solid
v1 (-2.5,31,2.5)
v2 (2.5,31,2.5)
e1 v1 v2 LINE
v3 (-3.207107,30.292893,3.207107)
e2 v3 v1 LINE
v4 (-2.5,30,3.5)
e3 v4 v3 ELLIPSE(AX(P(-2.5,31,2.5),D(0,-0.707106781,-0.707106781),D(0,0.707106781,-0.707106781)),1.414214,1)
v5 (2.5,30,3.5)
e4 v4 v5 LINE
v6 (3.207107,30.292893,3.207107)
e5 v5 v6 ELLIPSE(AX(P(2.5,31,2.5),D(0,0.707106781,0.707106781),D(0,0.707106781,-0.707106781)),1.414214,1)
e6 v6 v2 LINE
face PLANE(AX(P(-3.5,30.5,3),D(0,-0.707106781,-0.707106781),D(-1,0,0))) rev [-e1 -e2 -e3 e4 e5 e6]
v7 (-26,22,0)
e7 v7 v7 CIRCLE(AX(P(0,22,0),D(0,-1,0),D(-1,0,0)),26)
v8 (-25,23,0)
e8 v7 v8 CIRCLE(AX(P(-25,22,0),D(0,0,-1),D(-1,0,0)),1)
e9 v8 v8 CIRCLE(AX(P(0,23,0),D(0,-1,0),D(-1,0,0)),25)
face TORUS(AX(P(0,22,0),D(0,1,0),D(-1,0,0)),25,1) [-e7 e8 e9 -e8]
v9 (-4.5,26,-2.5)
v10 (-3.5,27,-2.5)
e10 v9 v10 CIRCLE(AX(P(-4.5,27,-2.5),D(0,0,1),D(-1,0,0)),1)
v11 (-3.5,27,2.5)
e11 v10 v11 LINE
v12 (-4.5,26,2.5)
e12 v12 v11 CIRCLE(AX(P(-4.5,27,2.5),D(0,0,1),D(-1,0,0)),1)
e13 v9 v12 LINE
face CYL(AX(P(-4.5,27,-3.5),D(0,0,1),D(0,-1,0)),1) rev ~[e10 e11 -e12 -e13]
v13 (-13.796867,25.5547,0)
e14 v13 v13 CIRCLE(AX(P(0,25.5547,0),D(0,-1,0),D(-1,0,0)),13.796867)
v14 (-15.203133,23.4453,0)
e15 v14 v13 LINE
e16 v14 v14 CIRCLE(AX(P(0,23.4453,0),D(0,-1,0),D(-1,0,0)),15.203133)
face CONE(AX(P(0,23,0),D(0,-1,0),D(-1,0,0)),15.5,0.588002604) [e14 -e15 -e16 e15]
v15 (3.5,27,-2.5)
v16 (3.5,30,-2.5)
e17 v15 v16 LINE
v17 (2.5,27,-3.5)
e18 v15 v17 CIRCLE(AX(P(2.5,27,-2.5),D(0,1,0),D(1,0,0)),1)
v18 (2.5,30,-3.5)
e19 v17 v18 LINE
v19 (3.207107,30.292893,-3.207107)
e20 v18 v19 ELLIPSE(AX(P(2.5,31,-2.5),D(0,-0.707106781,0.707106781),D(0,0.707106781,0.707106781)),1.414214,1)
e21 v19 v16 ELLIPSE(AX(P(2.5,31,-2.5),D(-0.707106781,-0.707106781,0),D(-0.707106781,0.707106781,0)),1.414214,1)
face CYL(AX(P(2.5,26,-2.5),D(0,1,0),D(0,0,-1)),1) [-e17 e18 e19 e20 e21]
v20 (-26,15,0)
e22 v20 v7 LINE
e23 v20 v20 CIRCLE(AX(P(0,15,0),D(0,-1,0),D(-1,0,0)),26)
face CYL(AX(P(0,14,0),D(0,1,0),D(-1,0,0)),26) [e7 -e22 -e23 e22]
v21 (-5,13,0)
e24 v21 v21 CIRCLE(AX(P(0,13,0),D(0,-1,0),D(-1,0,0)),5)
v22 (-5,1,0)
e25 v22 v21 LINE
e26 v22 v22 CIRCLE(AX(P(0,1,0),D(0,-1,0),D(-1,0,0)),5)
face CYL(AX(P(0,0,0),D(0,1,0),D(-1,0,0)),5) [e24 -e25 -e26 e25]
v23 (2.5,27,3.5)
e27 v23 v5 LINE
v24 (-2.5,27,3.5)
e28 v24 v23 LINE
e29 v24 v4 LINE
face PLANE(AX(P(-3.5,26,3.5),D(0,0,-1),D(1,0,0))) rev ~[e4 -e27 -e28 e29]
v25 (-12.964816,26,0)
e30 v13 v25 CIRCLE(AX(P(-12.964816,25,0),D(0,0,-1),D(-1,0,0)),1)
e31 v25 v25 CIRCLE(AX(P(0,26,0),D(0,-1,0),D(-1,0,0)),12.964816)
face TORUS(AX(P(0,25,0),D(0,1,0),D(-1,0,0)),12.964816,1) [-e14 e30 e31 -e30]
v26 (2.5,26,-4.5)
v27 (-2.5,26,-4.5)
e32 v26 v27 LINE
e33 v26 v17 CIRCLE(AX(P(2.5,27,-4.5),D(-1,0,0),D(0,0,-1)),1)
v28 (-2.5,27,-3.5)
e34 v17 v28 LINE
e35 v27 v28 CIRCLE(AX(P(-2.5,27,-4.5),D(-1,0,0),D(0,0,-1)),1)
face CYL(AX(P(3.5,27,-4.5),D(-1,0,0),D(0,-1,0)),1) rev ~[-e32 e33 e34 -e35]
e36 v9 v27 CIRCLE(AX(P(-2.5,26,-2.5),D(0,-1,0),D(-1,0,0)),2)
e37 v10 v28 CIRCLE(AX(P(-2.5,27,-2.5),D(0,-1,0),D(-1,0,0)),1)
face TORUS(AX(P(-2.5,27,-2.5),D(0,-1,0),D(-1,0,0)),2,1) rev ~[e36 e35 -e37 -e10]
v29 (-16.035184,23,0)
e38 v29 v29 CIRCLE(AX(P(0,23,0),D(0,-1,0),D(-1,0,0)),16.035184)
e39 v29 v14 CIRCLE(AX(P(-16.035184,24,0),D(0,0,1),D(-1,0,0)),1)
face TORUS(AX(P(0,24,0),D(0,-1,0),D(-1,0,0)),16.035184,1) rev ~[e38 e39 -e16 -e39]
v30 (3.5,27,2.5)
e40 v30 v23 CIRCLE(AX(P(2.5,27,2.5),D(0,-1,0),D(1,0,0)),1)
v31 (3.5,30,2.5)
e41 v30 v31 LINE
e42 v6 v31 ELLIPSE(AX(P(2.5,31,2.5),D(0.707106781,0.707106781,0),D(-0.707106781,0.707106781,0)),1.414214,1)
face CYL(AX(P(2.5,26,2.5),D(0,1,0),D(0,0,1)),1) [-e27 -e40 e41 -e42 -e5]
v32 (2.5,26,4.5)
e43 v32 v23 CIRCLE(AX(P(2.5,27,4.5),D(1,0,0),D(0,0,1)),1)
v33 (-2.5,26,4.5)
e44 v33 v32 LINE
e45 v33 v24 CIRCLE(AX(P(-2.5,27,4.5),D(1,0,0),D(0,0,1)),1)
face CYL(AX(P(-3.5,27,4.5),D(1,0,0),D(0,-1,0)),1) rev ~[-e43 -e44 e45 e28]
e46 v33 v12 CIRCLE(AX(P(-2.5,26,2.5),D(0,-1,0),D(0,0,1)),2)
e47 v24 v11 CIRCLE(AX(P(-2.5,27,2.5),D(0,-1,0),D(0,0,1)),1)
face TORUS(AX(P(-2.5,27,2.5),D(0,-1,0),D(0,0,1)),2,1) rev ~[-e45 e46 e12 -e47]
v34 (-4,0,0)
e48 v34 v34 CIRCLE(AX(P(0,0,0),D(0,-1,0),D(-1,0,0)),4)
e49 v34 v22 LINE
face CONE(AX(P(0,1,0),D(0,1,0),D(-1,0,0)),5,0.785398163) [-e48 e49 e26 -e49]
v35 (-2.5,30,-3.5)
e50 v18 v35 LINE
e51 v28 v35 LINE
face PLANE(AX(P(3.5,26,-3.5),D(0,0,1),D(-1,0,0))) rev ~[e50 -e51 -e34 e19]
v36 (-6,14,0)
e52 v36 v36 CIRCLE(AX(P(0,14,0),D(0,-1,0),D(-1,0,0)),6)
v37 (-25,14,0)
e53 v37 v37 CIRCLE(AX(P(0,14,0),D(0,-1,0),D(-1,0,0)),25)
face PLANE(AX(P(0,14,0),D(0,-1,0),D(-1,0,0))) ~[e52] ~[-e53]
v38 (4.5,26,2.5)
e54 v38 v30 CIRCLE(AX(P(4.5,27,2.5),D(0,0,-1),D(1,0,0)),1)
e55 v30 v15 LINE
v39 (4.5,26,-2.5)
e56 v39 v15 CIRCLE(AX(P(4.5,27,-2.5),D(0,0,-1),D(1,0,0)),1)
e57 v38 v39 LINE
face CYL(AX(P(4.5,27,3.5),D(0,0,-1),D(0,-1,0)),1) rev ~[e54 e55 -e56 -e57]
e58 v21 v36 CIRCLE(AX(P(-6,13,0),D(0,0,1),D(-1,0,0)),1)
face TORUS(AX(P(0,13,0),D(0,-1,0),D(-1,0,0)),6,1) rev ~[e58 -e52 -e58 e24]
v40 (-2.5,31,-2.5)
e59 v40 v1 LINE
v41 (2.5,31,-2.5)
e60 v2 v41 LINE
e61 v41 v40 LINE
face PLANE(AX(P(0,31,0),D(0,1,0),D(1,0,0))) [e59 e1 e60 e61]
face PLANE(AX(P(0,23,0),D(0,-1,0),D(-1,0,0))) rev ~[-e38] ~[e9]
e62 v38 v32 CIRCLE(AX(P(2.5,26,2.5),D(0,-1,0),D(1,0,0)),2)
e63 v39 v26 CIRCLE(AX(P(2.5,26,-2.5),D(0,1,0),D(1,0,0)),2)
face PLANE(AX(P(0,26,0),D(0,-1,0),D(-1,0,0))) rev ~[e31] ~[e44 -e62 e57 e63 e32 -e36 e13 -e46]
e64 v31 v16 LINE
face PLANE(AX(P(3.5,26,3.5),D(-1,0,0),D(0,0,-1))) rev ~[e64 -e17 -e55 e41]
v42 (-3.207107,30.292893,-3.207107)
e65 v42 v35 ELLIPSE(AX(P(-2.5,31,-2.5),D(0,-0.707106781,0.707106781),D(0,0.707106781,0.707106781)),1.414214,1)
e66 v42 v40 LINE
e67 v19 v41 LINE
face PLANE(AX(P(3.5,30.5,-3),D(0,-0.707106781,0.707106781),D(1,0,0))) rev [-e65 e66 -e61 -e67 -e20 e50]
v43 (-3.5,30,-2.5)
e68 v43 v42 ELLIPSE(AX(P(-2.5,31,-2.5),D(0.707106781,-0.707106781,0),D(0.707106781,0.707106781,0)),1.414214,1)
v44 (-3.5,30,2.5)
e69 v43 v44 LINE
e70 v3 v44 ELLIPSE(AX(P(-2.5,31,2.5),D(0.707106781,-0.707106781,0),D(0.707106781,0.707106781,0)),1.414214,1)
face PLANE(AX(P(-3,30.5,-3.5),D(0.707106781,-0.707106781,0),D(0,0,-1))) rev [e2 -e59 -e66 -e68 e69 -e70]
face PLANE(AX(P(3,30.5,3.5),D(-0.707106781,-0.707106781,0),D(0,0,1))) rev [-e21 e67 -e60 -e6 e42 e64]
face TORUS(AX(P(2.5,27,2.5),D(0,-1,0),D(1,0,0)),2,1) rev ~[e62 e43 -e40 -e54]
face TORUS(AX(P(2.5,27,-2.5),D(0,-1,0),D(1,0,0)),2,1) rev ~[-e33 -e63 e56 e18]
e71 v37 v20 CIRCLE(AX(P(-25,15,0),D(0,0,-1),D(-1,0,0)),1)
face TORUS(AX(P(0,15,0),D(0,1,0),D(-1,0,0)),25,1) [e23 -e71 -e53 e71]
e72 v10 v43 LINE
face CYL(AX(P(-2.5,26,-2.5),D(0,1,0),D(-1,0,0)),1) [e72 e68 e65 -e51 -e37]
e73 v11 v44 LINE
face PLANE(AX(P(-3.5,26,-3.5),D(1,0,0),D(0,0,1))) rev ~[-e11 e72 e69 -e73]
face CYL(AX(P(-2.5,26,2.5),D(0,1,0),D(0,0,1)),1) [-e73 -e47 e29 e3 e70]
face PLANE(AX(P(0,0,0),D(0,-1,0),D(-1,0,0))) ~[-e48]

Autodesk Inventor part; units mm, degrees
ref_plane "YZ Plane" through (0, 0, 0) normal (1, 0, 0) x (0, 1, 0)
ref_plane "XZ Plane" through (0, 0, 0) normal (0, 1, 0) x (-1, 0, 0)
ref_plane "XY Plane" through (0, 0, 0) normal (0, 0, 1) x (1, 0, 0)
sketch "Sketch1" plane through (0, 0, 0) normal (0, 0, 1) x (1, 0, 0)
  line L0 (0, 0) -> (-5, 0)
  line L1 (-5, 0) -> (-5, 14)
  line L2 (-5, 14) -> (-26, 14)
  line L3 (-26, 14) -> (-26, 23)
  line L4 (-26, 23) -> (-15.5, 23)
  line L5 (-15.5, 23) -> (-13.5, 26)
  line L6 (-13.5, 26) -> (0, 26)
  line L7 (0, 26) -> (0, 0) construction
  line L8 (0, 26) -> (0, 0)
  dimension "d0" = 5
  dimension "d1" = 14
  dimension "d2" = 9
  dimension "d4" = 3
  dimension "d5" = 13.5
  dimension "d6" = 15.5
  dimension "d7" = 26
  dimension "d8" = 26
revolve "Revolution1" add sketch "Sketch1" angle 360 about axis through (0, 26, 0) along (0, -1, 0)
sketch "Sketch4" plane through (0, 26, 0) normal (0, 1, 0) x (1, 0, 0)
  line L0 (3.5, 3.5) -> (-3.5, 3.5)
  line L1 (-3.5, 3.5) -> (-3.5, -3.5)
  line L2 (-3.5, -3.5) -> (3.5, -3.5)
  line L3 (3.5, -3.5) -> (3.5, 3.5)
  line L4 (3.5, 3.5) -> (-3.5, -3.5) construction
  line L5 (-3.5, 3.5) -> (3.5, -3.5) construction
  point P0 (0, 0)
  dimension "d26" = 7
  dimension "d27" = 7
extrude "Extrusion1" add sketch "Sketch4" along normal blind 5
thread "Thread1" size "M10x1.5" class "6g" standard "ISO Metric profile" length 9
chamfer "Chamfer1" distance 1 angle 45 5 edges at (5, 0, 0) (3.5, 31, 0) (0, 31, 3.5) (-3.5, 31, 0) (0, 31, -3.5)
fillet "Fillet4" radius 1 13 edges at (13.5, 26, 0) (15.5, 23, 0) (26, 23, 0) (26, 14, 0) (5, 14, 0) (3.5, 28, -3.5) (3.5, 28, 3.5) (-3.5, 28, -3.5) (-3.5, 28, 3.5) (3.5, 26, 0) (0, 26, 3.5) (-3.5, 26, 0) (0, 26, -3.5)
sketch "Sketch5" plane through (0, 23, 0) normal (0, 1, 0) x (1, 0, 0)
  point P0 (0, 0)
equation "\"BendRadius\" = Thickness"
equation "\"BendReliefWidth\" = Thickness"
equation "\"BendReliefDepth\" = 0.5 * Thickness"
equation "\"CornerReliefSize\" = 4 * Thickness"
equation "\"MinimumRemnant\" = 2 * Thickness"
equation "\"TransitionRadius\" = BendRadius"
equation "\"JacobiRadiusSize\" = BendRadius"
equation "\"GapSize\" = Thickness"
equation "\"Thickness\" = 0.5"
properties part number "Disc"
